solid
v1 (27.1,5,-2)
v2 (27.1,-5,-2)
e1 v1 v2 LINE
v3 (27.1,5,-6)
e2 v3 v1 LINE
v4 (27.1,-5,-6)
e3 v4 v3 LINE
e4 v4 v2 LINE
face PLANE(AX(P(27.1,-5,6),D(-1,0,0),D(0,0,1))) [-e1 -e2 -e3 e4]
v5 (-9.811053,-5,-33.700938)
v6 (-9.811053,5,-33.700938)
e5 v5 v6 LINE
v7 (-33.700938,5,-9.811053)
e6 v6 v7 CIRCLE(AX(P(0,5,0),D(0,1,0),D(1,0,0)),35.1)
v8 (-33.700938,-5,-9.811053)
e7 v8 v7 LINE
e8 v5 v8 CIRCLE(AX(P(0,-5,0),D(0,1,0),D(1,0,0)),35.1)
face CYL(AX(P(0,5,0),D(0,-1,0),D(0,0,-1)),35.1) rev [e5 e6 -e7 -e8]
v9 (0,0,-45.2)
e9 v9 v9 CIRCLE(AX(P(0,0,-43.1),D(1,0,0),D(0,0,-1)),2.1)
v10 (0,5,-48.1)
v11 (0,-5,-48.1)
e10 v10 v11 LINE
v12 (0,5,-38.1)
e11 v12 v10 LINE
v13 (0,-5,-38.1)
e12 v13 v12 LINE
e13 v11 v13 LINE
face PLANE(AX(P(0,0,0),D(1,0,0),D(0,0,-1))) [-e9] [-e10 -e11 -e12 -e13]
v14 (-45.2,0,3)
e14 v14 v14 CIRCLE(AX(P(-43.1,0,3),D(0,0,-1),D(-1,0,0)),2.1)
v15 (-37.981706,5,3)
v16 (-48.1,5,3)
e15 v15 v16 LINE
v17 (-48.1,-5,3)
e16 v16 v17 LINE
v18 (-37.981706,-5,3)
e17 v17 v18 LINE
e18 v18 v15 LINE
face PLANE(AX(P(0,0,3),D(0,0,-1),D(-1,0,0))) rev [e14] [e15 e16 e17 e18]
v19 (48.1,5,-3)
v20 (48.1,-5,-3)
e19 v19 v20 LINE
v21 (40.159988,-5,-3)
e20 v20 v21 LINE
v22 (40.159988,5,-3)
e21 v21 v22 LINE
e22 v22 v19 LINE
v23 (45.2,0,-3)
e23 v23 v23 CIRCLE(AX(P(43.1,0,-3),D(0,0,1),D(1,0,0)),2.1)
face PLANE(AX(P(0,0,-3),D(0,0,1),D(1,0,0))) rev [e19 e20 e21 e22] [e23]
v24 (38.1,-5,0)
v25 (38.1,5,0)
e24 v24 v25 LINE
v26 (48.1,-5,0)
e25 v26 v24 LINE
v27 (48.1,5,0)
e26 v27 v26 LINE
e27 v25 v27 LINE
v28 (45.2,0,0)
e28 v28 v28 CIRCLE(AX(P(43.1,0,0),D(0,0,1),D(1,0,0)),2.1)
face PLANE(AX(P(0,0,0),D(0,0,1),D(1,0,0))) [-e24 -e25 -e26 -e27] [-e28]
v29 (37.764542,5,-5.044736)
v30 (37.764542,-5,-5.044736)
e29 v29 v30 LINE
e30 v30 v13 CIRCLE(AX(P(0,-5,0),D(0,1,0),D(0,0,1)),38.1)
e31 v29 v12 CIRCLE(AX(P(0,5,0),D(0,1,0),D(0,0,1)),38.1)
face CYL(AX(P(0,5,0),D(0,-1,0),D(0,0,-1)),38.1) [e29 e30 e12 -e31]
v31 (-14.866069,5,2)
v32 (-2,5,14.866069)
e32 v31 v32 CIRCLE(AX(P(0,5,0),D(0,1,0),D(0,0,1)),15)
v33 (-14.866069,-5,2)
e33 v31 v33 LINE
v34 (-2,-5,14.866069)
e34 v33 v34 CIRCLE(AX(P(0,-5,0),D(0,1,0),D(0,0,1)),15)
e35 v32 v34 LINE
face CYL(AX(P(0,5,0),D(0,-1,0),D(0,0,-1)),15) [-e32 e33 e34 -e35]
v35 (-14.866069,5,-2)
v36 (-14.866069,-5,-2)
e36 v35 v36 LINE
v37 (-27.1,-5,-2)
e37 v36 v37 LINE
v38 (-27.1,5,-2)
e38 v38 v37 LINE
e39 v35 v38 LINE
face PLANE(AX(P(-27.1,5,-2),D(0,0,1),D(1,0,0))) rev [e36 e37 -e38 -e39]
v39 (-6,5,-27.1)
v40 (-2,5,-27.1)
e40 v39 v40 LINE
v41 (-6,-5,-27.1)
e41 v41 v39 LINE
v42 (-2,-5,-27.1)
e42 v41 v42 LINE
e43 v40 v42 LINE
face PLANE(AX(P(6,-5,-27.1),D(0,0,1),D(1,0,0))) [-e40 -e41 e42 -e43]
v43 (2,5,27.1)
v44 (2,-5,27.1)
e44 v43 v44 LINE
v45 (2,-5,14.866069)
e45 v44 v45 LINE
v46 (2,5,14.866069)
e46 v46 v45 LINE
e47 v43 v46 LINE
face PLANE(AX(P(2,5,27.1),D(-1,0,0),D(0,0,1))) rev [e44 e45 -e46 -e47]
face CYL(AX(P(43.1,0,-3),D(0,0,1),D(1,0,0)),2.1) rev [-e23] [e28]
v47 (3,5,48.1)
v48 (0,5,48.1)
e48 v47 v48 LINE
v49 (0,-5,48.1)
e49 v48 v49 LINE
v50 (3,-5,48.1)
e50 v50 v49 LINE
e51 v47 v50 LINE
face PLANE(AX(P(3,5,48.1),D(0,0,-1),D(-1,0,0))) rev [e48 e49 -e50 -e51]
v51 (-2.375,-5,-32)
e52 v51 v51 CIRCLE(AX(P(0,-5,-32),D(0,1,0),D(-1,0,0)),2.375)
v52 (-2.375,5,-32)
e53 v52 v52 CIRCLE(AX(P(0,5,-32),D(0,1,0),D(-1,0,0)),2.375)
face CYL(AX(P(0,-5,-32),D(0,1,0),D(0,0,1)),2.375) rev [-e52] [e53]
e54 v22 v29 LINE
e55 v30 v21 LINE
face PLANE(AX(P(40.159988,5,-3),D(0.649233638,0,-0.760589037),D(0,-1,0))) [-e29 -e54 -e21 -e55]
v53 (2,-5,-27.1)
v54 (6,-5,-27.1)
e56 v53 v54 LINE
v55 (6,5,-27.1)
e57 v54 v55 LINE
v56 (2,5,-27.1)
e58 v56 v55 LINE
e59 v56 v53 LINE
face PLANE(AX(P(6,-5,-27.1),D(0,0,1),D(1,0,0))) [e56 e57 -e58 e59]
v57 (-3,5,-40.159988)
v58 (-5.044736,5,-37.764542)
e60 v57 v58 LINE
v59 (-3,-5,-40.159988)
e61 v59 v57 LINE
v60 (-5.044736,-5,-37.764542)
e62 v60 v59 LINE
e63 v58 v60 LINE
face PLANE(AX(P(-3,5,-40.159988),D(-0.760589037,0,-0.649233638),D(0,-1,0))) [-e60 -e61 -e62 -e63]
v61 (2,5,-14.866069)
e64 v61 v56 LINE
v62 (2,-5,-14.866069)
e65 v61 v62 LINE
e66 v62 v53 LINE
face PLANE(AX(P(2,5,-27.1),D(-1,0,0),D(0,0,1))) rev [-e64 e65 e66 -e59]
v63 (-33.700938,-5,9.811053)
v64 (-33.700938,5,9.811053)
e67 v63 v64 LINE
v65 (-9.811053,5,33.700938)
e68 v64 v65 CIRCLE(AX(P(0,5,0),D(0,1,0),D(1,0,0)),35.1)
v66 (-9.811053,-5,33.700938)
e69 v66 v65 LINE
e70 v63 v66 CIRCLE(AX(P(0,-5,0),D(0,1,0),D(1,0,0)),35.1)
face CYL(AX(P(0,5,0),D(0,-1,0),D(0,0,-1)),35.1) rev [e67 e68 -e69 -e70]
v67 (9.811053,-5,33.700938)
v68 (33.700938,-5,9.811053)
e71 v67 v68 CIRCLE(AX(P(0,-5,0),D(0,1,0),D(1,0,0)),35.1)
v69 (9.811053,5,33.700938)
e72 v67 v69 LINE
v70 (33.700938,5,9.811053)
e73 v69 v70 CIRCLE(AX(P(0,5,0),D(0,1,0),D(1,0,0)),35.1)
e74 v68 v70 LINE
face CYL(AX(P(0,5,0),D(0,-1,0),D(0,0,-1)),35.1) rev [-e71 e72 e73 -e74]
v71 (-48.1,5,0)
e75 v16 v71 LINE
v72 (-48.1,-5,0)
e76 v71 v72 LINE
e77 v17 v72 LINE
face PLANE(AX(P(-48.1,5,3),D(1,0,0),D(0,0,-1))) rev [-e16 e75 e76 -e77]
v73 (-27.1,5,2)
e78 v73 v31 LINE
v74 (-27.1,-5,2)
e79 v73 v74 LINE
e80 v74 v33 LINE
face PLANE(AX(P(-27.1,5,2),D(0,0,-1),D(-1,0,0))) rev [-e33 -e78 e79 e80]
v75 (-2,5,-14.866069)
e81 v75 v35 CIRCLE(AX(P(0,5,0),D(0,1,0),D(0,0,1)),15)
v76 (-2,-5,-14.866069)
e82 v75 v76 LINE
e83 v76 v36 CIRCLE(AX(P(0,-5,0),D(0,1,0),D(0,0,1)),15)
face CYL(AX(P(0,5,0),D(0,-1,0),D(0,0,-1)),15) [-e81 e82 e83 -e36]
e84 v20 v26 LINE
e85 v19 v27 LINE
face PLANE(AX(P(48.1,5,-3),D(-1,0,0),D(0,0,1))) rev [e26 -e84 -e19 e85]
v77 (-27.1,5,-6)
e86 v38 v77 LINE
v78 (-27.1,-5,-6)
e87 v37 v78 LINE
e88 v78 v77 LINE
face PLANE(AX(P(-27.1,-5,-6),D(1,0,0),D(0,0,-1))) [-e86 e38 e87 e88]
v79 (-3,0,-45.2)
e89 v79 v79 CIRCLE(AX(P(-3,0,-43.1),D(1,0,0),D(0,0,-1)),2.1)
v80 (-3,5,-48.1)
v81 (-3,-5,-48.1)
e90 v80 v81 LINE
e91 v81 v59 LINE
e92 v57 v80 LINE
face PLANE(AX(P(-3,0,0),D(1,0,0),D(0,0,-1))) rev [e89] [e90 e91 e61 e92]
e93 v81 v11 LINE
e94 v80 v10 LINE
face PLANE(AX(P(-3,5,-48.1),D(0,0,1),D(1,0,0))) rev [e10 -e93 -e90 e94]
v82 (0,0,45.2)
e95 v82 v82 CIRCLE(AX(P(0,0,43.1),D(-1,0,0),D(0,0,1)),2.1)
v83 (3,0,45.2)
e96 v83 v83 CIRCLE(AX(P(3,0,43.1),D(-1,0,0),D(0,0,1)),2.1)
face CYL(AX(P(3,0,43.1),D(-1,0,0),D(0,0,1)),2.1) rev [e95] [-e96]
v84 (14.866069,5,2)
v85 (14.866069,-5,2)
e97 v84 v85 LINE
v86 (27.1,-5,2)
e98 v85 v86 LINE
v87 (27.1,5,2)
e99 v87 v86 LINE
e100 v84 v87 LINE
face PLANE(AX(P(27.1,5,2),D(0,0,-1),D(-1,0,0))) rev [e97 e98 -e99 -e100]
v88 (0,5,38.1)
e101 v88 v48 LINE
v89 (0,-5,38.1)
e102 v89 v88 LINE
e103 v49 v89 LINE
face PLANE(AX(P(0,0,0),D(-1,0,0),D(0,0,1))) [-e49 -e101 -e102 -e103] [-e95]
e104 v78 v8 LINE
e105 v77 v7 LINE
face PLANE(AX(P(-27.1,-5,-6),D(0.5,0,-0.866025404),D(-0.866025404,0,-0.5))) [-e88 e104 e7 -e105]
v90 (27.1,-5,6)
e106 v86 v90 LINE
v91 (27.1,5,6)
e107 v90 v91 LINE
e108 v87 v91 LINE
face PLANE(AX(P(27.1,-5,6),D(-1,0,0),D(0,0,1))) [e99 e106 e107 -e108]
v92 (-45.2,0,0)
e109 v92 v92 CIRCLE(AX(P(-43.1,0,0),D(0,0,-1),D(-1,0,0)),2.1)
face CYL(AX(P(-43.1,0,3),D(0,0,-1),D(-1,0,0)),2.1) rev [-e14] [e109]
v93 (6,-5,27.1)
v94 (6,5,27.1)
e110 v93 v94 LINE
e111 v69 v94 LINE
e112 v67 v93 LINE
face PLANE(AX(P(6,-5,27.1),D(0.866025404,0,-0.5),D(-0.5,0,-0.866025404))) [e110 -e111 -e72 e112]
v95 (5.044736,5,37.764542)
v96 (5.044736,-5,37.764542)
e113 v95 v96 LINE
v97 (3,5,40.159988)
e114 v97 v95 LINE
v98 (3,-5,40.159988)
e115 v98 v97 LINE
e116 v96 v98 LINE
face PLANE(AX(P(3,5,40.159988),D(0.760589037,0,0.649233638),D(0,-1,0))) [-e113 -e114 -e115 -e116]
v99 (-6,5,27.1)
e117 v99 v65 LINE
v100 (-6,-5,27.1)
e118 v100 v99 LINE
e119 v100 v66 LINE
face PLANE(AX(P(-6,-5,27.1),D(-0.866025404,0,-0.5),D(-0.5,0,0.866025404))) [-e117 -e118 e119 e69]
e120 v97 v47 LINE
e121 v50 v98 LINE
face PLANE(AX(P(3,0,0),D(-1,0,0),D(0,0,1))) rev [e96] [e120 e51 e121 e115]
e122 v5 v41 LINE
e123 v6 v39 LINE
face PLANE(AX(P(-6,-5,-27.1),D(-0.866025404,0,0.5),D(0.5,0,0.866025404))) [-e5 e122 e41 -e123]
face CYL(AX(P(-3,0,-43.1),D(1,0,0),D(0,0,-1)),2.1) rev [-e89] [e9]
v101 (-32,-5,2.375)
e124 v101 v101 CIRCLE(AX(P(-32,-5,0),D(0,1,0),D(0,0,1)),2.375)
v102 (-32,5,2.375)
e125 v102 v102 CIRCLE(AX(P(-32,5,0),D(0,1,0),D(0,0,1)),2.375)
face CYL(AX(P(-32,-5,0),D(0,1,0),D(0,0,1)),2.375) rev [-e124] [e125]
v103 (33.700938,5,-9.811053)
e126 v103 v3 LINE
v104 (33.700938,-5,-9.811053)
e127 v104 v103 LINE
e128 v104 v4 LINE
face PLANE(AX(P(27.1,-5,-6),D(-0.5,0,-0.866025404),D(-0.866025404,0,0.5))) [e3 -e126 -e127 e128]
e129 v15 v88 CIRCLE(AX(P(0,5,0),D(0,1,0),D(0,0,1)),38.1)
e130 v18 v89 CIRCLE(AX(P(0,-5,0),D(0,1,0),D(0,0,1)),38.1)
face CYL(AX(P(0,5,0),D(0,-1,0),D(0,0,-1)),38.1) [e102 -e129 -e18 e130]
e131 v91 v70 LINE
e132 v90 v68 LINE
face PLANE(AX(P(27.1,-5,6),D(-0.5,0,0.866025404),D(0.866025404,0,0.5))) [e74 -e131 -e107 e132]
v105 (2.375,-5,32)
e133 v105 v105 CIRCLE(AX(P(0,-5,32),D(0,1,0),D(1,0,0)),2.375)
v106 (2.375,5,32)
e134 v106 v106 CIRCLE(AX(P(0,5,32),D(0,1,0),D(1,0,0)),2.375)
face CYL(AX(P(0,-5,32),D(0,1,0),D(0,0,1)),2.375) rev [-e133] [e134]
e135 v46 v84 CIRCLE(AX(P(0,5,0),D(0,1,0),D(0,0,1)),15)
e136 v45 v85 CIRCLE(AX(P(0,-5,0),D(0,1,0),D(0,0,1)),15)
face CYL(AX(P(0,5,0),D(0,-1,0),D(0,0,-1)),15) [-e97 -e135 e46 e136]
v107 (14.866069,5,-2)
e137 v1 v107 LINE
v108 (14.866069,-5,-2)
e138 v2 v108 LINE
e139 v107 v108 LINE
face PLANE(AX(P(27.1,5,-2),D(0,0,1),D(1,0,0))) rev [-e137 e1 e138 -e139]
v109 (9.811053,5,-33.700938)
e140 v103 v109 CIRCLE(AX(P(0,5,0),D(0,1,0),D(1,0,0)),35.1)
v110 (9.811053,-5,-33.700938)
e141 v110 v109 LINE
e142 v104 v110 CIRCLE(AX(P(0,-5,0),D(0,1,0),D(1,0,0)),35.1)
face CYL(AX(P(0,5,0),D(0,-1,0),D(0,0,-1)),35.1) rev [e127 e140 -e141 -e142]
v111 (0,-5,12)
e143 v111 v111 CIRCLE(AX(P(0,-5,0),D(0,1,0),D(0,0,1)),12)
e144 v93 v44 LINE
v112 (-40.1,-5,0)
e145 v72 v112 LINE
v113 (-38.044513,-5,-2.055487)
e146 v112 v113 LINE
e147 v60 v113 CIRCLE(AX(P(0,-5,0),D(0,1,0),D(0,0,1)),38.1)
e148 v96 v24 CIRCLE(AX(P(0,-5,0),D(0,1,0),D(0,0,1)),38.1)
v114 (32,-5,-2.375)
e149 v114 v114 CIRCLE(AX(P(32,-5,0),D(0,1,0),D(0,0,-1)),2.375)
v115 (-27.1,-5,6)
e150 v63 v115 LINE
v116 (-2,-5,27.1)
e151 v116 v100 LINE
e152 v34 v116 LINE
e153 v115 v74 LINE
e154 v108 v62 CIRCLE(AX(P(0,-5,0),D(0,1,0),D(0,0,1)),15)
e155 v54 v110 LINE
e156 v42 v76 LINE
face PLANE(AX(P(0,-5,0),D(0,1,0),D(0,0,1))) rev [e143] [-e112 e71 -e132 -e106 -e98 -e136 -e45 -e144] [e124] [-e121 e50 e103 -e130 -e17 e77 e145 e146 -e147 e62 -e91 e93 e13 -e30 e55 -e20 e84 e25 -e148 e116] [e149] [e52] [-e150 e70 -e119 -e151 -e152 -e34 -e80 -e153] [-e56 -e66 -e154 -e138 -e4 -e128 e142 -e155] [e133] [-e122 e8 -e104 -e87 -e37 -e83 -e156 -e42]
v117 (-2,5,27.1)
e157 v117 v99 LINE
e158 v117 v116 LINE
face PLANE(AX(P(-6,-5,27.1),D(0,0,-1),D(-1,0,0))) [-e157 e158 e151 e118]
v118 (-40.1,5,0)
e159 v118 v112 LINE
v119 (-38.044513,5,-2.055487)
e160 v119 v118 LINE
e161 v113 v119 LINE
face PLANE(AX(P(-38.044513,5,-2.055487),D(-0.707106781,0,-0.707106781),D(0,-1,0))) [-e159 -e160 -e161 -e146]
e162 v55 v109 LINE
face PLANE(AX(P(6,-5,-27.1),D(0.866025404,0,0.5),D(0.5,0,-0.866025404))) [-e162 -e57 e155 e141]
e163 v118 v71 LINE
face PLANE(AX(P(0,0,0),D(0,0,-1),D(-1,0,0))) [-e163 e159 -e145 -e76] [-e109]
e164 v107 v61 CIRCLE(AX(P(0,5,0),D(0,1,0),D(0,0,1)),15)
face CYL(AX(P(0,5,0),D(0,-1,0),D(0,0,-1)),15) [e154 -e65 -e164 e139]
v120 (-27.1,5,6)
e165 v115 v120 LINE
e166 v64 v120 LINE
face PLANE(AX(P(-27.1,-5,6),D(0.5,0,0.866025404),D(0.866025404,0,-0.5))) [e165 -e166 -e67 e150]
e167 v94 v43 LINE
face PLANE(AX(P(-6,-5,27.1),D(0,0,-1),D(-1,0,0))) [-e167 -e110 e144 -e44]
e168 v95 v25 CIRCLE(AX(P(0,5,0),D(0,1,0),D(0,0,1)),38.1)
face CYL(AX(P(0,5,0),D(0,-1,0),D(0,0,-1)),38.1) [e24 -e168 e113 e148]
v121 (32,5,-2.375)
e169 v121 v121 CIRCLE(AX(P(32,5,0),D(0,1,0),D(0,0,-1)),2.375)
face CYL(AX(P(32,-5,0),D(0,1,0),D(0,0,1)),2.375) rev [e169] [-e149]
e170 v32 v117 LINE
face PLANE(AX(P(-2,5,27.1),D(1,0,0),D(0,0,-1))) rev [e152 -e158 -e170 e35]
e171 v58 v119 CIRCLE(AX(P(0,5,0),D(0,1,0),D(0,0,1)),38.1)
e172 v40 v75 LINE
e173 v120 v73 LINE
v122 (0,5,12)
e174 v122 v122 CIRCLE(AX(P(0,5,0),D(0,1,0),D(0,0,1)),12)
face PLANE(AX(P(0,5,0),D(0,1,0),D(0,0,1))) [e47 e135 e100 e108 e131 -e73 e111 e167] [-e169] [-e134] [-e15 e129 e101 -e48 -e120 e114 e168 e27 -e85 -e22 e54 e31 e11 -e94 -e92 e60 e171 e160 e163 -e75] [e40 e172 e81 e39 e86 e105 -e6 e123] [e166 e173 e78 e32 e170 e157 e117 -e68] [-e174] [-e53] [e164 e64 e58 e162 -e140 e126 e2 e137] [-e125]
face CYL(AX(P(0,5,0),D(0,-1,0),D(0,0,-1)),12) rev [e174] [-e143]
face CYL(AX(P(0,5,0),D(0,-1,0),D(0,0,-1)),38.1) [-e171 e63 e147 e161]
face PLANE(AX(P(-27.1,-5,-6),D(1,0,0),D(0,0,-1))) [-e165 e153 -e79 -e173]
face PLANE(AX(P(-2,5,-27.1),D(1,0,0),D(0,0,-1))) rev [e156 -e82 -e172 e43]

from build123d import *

# Parameters (mm, degrees)
SKETCH1_R           = 38.1
SKETCH1_R_2         = 35.1
EXTRUDE_THIN1_DEPTH = 5
BOSS_EXTRUDE1_START = -10
BOSS_EXTRUDE1_DEPTH = 10
SKETCH3_R           = 2.375
CUT_EXTRUDE1_DEPTH  = 10
CIRPATTERN1_COUNT   = 4
SKETCH4_W           = 11
SKETCH4_H           = 10
BOSS_EXTRUDE2_DEPTH = 3
SKETCH5_R           = 2.1
CUT_EXTRUDE2_DEPTH  = 3
CIRPATTERN2_COUNT   = 4
CHAMFER1_SIZE       = 2.178281406
CHAMFER1_SIZE_2     = 2
SKETCH6_R           = 12
BOSS_EXTRUDE3_DEPTH = 5


with BuildPart() as part:
    # Sketch1 → Extrude-Thin1 (new, symmetric)
    with BuildSketch(Plane(origin=(0, 0, 0), x_dir=(1, 0, 0), z_dir=(0, 1, 0))):
        Circle(SKETCH1_R)
        Circle(SKETCH1_R_2, mode=Mode.SUBTRACT)
    extrude(amount=EXTRUDE_THIN1_DEPTH, both=True)

    # Sketch2 → Boss-Extrude1 (add)
    with BuildSketch(Plane(origin=(0, 5, 0), x_dir=(1, 0, 0), z_dir=(0, 1, 0)).offset(BOSS_EXTRUDE1_START)):
        with BuildLine():
            Line((-27.1, 6), (-27.1, -6))
            Line((-27.1, -6), (-33.700938133, -9.811053408))
            ThreePointArc((-33.700938133, -9.811053408), (-35.1, 0), (-33.700938133, 9.811053408))
            Line((-33.700938133, 9.811053408), (-27.1, 6))
        make_face()
    boss_extrude1 = extrude(amount=BOSS_EXTRUDE1_DEPTH)

    # Sketch3 → Cut-Extrude1 (cut)
    with BuildSketch(Plane(origin=(0, 5, 0), x_dir=(1, 0, 0), z_dir=(0, 1, 0))):
        with Locations(Location((-32, 0, 0), (0, 0, 270))):
            Circle(SKETCH3_R)
    cut_extrude1 = extrude(amount=-CUT_EXTRUDE1_DEPTH, mode=Mode.SUBTRACT)

    # CirPattern1: Boss-Extrude1, Cut-Extrude1 ×4 about axis
    cirpattern1_axis = Axis((0, 0, 0), (0, 1, 0))
    add([boss_extrude1.rotate(cirpattern1_axis, i * 360 / CIRPATTERN1_COUNT) for i in range(1, CIRPATTERN1_COUNT)])
    add([cut_extrude1.rotate(cirpattern1_axis, i * 360 / CIRPATTERN1_COUNT) for i in range(1, CIRPATTERN1_COUNT)], mode=Mode.SUBTRACT)

    # Sketch4 → Boss-Extrude2 (add)
    with BuildSketch(Plane.XY):
        with Locations((-42.6, 0)):
            Rectangle(SKETCH4_W, SKETCH4_H)
    boss_extrude2 = extrude(amount=BOSS_EXTRUDE2_DEPTH)

    # Sketch5 → Cut-Extrude2 (cut)
    with BuildSketch(Plane(origin=(0, 0, 0), x_dir=(-1, 0, 0), z_dir=(0, 0, -1))):
        with Locations((43.1, 0)):
            Circle(SKETCH5_R)
    cut_extrude2 = extrude(amount=-CUT_EXTRUDE2_DEPTH, mode=Mode.SUBTRACT)

    # CirPattern2: Boss-Extrude2, Cut-Extrude2 ×4 about axis
    cirpattern2_axis = Axis((0, 0, 0), (0, 1, 0))
    add([boss_extrude2.rotate(cirpattern2_axis, i * 360 / CIRPATTERN2_COUNT) for i in range(1, CIRPATTERN2_COUNT)])
    add([cut_extrude2.rotate(cirpattern2_axis, i * 360 / CIRPATTERN2_COUNT) for i in range(1, CIRPATTERN2_COUNT)], mode=Mode.SUBTRACT)

    # Chamfer1
    # the kernel refuses this chamfer: 2.178281406, 2 mm, written as the material it adds along each edge
    with BuildSketch(Plane(origin=(-3, -5, -37.981706123), x_dir=(-0.9944073694019739, 0, 0.10561242199214178), z_dir=(0, 1, 0))) as chamfer1_piece_1:
        with BuildLine():
            Line((2.056235734, 0), (-CHAMFER1_SIZE * 0.105612421996, -CHAMFER1_SIZE * 0.994407369435))
            Line((-CHAMFER1_SIZE * 0.105612421996, -CHAMFER1_SIZE * 0.994407369435), (0, 0))
            ThreePointArc((0, 0), (1.059779898, -0.013861107), (2.056235734, 0))
        make_face()
    extrude(amount=10)
    with BuildSketch(Plane(origin=(37.981706123, -5, -3), x_dir=(1, 0, 0), z_dir=(0, 1, 0)), Plane(origin=(3, -5, 37.981706123), x_dir=(0, 0, 1), z_dir=(0, 1, 0))) as chamfer1_piece_2:
        with BuildLine():
            Line((CHAMFER1_SIZE, 0), (-0.217164036, 2.044735967))
            ThreePointArc((-0.217164036, 2.044735967), (-0.098142335, 1.055316846), (0, 0))
            Line((0, 0), (CHAMFER1_SIZE, 0))
        make_face()
    extrude(amount=10)
    with BuildSketch(Plane(origin=(-38.1, -5, 0), x_dir=(0.026984720913872013, 0, -0.9996358461145741), z_dir=(0, 1, 0))) as chamfer1_piece_3:
        with BuildLine():
            Line((2.056235734, 0), (-CHAMFER1_SIZE_2 * 0.0269847209139, CHAMFER1_SIZE_2 * 0.999635846115))
            Line((-CHAMFER1_SIZE_2 * 0.0269847209139, CHAMFER1_SIZE_2 * 0.999635846115), (0, 0))
            ThreePointArc((0, 0), (1.057186648, 0.013863174), (2.056235734, 0))
        make_face()
    extrude(amount=10)

    # Sketch6 → Boss-Extrude3 (add, symmetric)
    with BuildSketch(Plane(origin=(0, 0, 0), x_dir=(1, 0, 0), z_dir=(0, 1, 0))):
        with BuildLine():
            Line((-2, 27.1), (-2, 14.866068747))
            ThreePointArc((-2, 14.866068747), (-10.606601718, 10.606601718), (-14.866068747, 2))
            Line((-14.866068747, 2), (-27.1, 2))
            Line((-27.1, 2), (-27.1, -2))
            Line((-27.1, -2), (-14.866068747, -2))
            ThreePointArc((-14.866068747, -2), (-10.606601718, -10.606601718), (-2, -14.866068747))
            Line((-2, -14.866068747), (-2, -27.1))
            Line((-2, -27.1), (2, -27.1))
            Line((2, -27.1), (2, -14.866068747))
            ThreePointArc((2, -14.866068747), (10.606601718, -10.606601718), (14.866068747, -2))
            Line((14.866068747, -2), (27.1, -2))
            Line((27.1, -2), (27.1, 2))
            Line((27.1, 2), (14.866068747, 2))
            ThreePointArc((14.866068747, 2), (10.606601718, 10.606601718), (2, 14.866068747))
            Line((2, 14.866068747), (2, 27.1))
            Line((2, 27.1), (-2, 27.1))
        make_face()
        with Locations(Location((0, 0, 0), (0, 0, 270))):
            Circle(SKETCH6_R, mode=Mode.SUBTRACT)
    extrude(amount=BOSS_EXTRUDE3_DEPTH, both=True)


solid = part.part
